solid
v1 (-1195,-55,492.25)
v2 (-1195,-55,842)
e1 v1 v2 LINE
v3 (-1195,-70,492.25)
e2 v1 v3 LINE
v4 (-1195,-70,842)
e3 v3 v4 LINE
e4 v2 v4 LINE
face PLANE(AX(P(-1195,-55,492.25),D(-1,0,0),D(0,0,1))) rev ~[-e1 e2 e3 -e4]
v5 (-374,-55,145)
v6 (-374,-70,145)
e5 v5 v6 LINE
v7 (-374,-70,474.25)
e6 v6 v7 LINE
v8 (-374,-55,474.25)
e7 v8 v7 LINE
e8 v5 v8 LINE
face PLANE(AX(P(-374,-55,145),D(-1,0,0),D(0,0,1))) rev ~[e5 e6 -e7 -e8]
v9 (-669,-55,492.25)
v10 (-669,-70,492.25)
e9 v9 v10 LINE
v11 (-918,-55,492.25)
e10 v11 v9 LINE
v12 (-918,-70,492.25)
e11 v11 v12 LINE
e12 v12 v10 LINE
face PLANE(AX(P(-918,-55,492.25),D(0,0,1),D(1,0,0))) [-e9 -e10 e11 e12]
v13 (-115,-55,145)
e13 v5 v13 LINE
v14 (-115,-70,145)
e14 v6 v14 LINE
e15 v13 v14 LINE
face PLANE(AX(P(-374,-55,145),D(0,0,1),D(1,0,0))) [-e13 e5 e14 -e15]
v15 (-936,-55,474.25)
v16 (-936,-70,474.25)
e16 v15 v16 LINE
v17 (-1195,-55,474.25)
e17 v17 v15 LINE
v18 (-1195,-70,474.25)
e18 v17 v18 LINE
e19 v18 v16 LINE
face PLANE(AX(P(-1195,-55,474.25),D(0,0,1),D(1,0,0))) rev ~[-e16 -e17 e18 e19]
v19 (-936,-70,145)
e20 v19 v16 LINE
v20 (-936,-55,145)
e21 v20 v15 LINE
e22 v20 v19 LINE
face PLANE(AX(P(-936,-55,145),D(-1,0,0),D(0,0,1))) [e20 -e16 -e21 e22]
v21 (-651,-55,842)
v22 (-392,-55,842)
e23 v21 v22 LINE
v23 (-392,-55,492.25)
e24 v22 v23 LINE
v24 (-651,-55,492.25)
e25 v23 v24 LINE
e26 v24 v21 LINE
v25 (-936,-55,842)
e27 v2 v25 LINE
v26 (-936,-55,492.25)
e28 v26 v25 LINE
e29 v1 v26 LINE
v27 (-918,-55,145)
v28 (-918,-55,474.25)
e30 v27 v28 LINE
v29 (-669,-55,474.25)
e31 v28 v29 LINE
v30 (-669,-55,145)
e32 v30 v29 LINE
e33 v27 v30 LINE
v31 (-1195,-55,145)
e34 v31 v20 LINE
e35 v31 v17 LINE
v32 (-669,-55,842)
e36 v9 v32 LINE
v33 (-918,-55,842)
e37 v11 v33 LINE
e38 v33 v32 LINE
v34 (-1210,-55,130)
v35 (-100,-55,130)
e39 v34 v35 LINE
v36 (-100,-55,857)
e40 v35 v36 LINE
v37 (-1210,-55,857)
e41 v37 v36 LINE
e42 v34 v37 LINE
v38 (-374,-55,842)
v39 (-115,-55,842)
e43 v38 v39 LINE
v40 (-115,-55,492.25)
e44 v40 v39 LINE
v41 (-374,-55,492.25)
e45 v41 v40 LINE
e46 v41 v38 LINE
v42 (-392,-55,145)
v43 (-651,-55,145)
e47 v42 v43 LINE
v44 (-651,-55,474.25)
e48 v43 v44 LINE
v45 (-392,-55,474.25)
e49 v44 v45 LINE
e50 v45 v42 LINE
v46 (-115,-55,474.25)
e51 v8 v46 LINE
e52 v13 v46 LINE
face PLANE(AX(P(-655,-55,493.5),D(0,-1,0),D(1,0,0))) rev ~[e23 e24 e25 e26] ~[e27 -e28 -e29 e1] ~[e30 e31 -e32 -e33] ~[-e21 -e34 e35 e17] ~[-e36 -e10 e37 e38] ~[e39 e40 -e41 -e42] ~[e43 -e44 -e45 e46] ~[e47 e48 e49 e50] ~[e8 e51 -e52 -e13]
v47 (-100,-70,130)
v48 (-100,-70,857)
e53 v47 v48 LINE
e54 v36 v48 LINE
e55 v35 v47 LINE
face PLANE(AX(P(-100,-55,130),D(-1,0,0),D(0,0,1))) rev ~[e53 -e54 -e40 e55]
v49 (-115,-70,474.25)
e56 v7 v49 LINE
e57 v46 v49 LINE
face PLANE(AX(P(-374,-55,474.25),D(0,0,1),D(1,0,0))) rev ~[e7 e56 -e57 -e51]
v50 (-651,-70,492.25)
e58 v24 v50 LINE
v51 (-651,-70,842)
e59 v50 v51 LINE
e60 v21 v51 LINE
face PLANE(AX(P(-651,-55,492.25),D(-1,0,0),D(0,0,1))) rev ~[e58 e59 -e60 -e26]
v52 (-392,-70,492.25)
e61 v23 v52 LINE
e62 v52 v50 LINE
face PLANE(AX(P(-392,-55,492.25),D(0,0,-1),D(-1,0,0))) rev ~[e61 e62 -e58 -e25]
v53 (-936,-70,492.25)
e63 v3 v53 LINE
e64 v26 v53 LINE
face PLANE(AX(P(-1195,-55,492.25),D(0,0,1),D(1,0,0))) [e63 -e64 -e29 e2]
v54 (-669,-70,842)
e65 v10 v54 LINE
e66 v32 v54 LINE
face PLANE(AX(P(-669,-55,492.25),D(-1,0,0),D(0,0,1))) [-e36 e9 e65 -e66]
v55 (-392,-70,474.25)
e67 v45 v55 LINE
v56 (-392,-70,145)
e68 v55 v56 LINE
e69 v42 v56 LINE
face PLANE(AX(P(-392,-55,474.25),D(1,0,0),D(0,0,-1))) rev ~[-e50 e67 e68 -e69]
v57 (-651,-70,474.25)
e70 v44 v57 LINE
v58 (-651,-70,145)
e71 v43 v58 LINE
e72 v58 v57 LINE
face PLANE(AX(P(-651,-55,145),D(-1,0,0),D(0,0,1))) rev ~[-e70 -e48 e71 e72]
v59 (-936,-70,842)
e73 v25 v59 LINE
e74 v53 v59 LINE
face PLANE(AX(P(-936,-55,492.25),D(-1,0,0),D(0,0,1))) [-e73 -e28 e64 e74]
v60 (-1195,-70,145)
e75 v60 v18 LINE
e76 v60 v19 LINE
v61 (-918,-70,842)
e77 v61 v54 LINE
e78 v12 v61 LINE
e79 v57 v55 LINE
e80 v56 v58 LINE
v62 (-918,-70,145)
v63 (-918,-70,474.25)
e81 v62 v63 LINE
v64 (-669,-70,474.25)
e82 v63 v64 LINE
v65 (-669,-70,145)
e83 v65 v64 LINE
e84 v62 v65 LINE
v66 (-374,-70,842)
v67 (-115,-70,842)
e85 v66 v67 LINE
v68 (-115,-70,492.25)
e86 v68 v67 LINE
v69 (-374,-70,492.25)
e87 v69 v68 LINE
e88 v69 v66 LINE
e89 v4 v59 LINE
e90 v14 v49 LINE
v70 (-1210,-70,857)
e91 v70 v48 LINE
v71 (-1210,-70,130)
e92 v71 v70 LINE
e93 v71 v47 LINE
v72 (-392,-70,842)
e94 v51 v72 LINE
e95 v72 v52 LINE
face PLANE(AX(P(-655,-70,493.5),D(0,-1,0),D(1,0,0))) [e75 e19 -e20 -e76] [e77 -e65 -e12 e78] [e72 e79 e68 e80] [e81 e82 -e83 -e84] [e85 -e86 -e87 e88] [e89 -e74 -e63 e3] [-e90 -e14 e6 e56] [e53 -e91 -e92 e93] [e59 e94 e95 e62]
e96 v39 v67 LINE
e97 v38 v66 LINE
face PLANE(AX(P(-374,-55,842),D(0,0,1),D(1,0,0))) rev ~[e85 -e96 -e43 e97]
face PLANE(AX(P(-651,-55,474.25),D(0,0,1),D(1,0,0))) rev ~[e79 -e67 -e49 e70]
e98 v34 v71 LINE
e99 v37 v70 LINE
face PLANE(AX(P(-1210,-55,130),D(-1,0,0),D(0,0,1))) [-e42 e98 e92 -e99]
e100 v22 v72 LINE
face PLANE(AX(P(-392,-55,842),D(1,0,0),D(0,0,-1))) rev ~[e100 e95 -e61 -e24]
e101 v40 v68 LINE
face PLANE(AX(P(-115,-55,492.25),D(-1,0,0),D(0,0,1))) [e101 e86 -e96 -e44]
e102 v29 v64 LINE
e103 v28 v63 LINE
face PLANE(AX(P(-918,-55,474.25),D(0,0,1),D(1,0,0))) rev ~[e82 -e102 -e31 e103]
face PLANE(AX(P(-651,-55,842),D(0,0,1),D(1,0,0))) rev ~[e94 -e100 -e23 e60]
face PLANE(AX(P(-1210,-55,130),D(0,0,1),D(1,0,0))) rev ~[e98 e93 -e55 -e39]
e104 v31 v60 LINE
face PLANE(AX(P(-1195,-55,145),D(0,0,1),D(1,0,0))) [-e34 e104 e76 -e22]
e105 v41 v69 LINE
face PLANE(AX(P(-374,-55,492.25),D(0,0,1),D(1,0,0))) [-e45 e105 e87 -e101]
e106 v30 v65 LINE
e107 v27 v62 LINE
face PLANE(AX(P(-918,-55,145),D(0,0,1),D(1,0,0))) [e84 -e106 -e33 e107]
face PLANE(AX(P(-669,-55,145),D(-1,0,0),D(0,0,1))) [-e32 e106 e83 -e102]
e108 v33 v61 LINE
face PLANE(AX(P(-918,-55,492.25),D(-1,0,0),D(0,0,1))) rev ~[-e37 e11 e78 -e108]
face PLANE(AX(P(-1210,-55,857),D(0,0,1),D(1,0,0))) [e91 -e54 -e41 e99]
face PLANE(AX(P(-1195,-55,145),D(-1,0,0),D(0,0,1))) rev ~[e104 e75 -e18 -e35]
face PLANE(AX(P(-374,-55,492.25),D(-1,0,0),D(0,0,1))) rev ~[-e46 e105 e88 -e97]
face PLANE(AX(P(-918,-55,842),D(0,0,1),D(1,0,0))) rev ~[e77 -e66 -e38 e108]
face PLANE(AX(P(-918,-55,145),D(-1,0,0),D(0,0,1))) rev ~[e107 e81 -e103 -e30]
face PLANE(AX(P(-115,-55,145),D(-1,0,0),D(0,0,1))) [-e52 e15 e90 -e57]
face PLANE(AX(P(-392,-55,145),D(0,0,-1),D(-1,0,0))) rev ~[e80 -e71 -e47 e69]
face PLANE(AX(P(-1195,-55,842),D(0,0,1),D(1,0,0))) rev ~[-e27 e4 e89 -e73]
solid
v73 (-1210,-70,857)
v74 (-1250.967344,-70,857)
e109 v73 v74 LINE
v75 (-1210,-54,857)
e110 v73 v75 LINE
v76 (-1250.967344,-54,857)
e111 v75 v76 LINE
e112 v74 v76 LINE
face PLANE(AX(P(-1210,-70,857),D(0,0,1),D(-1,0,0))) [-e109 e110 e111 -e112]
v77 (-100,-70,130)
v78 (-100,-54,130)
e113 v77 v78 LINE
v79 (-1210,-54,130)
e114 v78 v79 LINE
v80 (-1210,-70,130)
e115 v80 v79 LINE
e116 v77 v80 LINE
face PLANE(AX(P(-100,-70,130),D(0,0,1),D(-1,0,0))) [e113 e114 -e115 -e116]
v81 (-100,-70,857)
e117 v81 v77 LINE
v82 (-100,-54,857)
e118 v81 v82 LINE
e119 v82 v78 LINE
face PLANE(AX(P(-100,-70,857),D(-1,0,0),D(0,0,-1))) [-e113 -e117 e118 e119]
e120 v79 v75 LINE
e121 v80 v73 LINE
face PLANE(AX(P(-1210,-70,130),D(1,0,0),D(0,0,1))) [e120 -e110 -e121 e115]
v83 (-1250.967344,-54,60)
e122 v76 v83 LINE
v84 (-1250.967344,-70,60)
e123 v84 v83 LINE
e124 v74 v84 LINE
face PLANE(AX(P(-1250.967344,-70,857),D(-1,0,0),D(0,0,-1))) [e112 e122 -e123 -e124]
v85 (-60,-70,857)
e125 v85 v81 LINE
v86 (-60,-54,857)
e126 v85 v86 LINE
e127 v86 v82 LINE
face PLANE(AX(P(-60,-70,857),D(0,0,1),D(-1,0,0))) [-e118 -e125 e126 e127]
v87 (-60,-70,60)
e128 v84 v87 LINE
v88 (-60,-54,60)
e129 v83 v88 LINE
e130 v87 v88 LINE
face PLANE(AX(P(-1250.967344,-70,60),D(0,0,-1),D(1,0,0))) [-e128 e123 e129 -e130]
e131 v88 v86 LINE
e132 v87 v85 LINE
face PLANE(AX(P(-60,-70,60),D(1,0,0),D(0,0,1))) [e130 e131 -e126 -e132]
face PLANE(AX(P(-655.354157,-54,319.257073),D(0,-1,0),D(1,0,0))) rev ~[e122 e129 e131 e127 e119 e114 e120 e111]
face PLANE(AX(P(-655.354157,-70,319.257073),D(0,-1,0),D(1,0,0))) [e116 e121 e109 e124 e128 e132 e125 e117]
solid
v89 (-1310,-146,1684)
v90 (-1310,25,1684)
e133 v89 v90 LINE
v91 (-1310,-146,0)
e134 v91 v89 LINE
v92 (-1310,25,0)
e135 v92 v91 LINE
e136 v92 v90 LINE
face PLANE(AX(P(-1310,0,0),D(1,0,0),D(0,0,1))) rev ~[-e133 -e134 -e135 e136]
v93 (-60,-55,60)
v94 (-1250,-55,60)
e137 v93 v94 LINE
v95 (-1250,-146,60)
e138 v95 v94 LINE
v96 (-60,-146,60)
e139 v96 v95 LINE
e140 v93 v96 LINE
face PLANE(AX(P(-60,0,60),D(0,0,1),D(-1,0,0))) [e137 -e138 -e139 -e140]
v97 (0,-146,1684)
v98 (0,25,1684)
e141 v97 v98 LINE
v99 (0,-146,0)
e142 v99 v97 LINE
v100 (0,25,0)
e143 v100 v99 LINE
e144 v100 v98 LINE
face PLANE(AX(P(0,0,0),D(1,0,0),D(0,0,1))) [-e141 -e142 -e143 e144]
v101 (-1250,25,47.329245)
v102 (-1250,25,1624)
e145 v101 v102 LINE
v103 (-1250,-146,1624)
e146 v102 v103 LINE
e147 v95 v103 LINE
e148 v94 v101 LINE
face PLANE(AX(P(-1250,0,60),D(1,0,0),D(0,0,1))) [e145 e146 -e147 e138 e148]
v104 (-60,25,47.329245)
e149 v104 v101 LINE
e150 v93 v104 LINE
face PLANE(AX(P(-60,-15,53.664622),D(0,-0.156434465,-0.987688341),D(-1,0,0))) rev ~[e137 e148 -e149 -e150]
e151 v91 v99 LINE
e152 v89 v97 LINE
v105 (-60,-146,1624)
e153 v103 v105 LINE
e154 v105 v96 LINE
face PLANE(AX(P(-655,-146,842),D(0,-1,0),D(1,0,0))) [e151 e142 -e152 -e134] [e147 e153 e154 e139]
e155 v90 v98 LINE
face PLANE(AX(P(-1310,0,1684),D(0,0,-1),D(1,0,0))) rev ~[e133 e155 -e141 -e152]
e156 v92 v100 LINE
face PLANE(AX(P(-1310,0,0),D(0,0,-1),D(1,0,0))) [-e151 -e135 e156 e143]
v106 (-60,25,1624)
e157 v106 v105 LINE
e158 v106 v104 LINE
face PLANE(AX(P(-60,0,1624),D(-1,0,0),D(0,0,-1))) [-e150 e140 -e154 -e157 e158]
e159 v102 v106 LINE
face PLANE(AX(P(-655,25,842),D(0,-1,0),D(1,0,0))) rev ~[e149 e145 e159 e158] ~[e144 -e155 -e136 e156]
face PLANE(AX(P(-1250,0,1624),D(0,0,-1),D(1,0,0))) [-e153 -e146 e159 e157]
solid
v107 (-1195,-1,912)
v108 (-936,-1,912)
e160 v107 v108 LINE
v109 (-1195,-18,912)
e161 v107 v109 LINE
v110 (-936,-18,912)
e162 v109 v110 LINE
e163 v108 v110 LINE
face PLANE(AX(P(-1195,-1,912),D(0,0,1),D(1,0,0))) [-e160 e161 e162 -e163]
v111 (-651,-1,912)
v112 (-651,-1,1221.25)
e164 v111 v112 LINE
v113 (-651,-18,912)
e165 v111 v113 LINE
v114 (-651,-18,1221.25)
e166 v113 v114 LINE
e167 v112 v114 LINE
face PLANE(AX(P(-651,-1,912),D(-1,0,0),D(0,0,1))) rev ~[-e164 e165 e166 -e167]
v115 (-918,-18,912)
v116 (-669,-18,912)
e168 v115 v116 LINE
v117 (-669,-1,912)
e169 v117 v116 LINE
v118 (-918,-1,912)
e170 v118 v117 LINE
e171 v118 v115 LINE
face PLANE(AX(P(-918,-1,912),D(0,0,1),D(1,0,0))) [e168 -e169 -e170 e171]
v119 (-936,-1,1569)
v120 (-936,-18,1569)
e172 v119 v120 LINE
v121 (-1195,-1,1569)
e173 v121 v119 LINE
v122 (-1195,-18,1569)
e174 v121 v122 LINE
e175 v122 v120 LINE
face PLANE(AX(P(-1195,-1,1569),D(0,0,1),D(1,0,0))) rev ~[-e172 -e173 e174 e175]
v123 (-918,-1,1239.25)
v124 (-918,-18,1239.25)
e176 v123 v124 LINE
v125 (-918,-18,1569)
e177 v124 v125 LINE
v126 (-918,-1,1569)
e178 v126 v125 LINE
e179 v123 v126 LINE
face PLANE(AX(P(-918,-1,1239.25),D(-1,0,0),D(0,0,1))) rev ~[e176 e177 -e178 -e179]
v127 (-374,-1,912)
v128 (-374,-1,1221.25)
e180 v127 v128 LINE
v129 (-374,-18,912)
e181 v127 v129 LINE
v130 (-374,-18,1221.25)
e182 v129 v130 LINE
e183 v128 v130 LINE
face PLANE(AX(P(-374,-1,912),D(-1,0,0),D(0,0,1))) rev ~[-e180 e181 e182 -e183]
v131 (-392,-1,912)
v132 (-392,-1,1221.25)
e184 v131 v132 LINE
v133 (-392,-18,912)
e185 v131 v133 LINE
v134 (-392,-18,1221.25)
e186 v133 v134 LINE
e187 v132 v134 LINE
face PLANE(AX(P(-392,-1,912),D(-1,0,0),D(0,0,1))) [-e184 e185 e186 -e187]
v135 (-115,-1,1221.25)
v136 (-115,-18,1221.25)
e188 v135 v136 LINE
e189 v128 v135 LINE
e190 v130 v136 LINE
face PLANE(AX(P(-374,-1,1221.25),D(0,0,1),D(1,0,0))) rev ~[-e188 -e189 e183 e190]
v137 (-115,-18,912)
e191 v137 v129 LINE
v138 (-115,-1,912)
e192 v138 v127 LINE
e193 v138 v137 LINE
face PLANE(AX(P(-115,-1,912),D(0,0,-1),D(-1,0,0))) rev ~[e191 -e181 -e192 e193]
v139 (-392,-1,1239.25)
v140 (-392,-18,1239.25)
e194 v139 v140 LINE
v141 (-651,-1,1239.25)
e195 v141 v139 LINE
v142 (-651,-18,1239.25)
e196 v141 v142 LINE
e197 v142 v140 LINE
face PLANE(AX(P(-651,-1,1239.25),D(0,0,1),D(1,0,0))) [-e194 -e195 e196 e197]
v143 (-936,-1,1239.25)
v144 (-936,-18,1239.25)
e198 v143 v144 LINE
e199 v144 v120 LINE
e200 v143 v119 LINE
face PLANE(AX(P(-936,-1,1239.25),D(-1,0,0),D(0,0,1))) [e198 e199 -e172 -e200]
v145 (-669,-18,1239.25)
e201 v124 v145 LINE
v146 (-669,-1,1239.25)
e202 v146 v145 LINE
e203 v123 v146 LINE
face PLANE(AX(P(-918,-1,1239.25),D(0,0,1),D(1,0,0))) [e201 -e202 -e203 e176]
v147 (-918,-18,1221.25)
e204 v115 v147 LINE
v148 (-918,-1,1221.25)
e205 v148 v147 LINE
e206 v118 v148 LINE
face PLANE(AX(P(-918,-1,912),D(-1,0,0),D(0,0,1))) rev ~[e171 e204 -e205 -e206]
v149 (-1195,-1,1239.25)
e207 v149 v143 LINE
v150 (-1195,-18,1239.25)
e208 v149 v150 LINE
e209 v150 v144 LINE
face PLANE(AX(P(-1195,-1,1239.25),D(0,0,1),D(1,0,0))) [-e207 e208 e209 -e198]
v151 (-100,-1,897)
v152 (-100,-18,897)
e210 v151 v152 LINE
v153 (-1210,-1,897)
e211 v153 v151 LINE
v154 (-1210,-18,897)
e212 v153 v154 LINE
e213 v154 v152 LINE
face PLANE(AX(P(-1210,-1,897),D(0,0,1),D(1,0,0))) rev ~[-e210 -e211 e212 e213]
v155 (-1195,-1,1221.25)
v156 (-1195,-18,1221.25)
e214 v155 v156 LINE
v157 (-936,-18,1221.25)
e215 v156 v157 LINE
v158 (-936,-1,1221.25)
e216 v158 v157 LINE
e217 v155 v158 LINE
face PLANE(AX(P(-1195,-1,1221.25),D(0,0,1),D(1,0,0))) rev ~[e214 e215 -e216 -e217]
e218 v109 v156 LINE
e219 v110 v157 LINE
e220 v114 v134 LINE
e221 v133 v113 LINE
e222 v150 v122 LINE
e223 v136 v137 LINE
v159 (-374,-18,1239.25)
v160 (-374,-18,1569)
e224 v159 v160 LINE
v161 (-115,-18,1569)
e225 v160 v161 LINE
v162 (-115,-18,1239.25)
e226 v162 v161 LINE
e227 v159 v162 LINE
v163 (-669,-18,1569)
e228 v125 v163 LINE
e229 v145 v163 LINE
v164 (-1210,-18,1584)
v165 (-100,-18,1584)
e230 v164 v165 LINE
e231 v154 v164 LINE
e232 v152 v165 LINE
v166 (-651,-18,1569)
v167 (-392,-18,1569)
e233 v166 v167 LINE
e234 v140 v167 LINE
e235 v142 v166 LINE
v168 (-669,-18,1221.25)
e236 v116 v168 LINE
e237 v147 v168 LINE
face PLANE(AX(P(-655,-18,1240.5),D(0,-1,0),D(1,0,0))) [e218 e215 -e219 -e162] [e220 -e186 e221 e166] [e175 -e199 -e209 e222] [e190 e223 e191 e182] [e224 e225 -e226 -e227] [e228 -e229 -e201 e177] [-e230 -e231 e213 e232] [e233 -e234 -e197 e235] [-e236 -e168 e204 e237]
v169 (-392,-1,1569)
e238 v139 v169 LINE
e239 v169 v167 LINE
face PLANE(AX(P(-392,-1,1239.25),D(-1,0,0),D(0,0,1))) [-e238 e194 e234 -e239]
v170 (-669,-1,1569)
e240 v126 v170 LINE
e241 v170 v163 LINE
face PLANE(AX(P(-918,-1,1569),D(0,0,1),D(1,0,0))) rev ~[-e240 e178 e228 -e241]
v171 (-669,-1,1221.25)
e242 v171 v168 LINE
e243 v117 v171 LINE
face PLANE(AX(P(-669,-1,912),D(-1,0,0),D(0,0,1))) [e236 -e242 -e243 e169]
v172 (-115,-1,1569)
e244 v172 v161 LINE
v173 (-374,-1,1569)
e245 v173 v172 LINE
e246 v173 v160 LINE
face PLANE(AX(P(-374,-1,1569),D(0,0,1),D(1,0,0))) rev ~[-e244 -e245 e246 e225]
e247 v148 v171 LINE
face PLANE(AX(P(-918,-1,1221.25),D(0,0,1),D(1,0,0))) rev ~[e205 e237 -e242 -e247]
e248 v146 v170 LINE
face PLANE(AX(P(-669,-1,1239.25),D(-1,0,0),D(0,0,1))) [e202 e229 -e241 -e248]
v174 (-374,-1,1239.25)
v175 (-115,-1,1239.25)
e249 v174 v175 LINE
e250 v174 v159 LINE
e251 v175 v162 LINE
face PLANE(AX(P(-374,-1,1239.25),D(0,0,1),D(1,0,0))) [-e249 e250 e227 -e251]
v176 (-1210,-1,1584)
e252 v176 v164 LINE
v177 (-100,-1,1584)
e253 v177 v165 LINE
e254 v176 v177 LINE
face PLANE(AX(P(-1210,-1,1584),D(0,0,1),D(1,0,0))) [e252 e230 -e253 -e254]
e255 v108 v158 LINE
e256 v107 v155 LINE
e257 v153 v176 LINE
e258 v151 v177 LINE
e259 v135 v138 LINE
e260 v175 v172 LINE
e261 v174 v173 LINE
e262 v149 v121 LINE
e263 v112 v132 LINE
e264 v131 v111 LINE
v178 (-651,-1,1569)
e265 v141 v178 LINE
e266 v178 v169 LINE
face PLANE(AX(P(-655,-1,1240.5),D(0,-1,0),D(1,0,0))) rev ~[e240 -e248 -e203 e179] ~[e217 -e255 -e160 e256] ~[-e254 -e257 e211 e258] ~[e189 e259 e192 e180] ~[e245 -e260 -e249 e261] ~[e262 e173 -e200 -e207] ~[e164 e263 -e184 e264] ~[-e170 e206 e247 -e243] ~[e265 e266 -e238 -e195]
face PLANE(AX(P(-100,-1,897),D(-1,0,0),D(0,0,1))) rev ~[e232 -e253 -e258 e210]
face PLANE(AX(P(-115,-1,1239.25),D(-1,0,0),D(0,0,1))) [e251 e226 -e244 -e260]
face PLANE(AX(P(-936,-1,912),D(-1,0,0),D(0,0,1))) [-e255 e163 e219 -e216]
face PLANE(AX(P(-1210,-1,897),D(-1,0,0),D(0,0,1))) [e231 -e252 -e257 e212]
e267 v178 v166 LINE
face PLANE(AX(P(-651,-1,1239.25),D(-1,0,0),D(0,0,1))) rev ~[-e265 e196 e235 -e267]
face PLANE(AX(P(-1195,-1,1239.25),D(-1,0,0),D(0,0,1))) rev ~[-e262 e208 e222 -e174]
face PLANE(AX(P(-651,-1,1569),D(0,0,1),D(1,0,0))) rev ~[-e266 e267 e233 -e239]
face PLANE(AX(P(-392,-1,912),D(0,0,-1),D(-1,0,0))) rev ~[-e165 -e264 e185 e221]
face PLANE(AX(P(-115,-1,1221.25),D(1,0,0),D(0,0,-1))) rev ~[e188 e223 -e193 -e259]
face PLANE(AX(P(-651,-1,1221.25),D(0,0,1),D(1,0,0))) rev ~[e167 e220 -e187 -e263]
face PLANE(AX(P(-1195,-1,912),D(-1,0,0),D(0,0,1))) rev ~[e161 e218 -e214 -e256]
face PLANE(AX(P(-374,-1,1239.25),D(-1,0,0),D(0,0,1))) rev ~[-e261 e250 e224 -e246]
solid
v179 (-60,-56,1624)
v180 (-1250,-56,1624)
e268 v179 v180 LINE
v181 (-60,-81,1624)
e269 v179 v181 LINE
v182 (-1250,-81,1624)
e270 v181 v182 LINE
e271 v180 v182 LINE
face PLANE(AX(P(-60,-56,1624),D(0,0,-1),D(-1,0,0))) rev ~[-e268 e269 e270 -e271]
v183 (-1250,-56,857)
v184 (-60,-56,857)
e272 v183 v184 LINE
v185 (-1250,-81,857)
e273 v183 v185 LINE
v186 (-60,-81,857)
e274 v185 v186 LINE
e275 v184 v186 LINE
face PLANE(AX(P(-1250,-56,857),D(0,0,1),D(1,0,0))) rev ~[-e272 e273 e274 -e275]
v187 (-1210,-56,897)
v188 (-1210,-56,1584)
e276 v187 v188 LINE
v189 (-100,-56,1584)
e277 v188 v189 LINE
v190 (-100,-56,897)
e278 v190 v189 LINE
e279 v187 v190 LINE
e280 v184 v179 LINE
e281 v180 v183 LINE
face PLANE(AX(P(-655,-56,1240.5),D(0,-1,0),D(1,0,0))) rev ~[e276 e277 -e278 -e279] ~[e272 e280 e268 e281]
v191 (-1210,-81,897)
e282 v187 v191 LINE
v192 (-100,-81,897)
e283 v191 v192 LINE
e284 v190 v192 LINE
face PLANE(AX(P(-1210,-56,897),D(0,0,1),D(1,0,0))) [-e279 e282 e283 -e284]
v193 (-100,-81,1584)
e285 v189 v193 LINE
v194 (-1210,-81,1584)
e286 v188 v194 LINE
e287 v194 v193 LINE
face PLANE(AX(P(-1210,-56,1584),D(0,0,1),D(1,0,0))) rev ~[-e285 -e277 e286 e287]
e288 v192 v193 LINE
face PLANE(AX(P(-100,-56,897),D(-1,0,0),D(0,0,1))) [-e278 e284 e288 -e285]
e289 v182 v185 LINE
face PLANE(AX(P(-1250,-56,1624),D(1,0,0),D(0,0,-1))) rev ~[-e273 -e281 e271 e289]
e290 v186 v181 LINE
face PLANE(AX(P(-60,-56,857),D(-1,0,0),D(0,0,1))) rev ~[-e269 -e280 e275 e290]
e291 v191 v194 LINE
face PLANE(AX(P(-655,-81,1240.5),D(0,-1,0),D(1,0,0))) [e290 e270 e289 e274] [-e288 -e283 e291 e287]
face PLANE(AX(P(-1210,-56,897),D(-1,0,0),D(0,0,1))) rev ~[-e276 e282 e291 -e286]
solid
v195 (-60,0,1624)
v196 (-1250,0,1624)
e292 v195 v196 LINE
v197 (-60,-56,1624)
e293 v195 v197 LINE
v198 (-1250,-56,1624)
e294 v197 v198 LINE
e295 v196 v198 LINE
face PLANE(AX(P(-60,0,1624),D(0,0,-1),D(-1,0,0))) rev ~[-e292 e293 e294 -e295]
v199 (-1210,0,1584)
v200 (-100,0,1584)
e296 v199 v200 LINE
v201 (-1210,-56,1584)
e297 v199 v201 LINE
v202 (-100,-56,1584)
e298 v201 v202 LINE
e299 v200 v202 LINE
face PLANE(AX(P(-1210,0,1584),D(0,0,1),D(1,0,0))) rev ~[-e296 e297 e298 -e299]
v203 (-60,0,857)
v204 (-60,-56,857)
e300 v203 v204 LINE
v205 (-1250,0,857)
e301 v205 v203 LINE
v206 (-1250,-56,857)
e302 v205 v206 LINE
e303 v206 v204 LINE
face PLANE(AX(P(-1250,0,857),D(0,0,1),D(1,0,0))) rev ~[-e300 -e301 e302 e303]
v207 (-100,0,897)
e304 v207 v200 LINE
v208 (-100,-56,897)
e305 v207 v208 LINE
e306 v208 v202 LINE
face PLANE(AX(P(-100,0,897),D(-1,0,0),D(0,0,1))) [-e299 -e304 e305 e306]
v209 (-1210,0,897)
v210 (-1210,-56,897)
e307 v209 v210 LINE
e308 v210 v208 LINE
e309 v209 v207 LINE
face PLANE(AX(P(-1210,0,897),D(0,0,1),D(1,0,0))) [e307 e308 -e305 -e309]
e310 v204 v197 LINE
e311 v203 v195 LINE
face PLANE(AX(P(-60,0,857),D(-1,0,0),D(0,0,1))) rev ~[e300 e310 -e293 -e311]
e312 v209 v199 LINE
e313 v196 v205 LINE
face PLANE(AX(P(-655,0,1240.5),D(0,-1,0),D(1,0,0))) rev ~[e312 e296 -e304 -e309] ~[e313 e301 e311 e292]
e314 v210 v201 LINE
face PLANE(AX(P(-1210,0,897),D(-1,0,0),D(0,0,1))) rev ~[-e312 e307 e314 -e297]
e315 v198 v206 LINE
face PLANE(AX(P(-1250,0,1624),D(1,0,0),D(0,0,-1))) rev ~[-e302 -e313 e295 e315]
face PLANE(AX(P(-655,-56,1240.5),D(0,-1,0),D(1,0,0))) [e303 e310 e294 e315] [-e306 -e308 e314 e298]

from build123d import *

# Parameters (mm, degrees)
F0_W          = 1310
F0_H          = 1684
F1_DEPTH      = 146
F1_DEPTH_BACK = 25
F0_W_2        = 1110
F0_H_2        = 687
F2_DEPTH      = 56
F3_START      = 1
F0_W_3        = 259
F0_H_3        = 309.25
F0_W_4        = 249
F0_H_4        = 329.75
F0_W_5        = 18
F3_DEPTH      = 17
F4_START      = 55
F0_H_5        = 727
F0_H_6        = 329.25
F0_H_7        = 349.75
F4_DEPTH      = 15
F5_SIZE2      = 12.670755226
F5_SIZE       = 80
F6_DEPTH      = 25
F8_DEPTH      = 16


# Not quite as in the source:
# - a feature names something its author has since deleted; it is built from what else it names


with BuildPart() as f1:
    # F0 (on Front) → F1 (new body, two sides)
    with BuildSketch(Plane.XZ) as f1_sk:
        with Locations((-655, 842)):
            Rectangle(F0_W, F0_H)
        Polygon((-1250, 1624), (-60, 1624), (-60, 857), (-60, 60), (-1250, 60), (-1250, 857), align=None, mode=Mode.SUBTRACT)
    extrude(amount=F1_DEPTH)
    extrude(f1_sk.sketch, amount=-F1_DEPTH_BACK)

    # F5
    f5_edges = [f1.edges().sort_by_distance(p)[0] for p in [
        (-655, 25, 60),
    ]]
    f5_side = f1.faces().sort_by_distance((-655, -60.5, 60))[0]
    chamfer(f5_edges, length=F5_SIZE, length2=F5_SIZE2, reference=f5_side)


with BuildPart() as f2:
    # F0 (on Front) → F2 (new body)
    with BuildSketch(Plane.XZ):
        Polygon((-60, 857), (-60, 1624), (-1250, 1624), (-1250, 857), (-1210, 857), (-100, 857), align=None)
        with Locations((-655, 1240.5)):
            Rectangle(F0_W_2, F0_H_2, mode=Mode.SUBTRACT)
    extrude(amount=F2_DEPTH)


with BuildPart() as f3:
    # F0 (on Front) → F3 (new body)
    with BuildSketch(Plane.XZ.offset(F3_START)):
        with Locations((-655, 1240.5)):
            Rectangle(F0_W_2, F0_H_2)
        with Locations((-1065.5, 1066.625)):
            Rectangle(F0_W_3, F0_H_3, mode=Mode.SUBTRACT)
        with Locations((-793.5, 1066.625)):
            Rectangle(F0_W_4, F0_H_3, mode=Mode.SUBTRACT)
        with Locations((-1065.5, 1404.125)):
            Rectangle(F0_W_3, F0_H_4, mode=Mode.SUBTRACT)
        with Locations((-793.5, 1404.125)):
            Rectangle(F0_W_4, F0_H_4, mode=Mode.SUBTRACT)
        Polygon((-374, 1221.25), (-115, 1221.25), (-115, 912), (-374, 912), (-392, 912), (-651, 912), (-651, 1221.25), (-392, 1221.25), align=None, mode=Mode.SUBTRACT)
        with Locations((-521.5, 1404.125)):
            Rectangle(F0_W_3, F0_H_4, mode=Mode.SUBTRACT)
        with Locations((-244.5, 1404.125)):
            Rectangle(F0_W_3, F0_H_4, mode=Mode.SUBTRACT)
        with Locations((-383, 1066.625)):
            Rectangle(F0_W_5, F0_H_3)
    extrude(amount=F3_DEPTH)


with BuildPart() as f4:
    # F0 (on Front) → F4 (new body)
    with BuildSketch(Plane.XZ.offset(F4_START)):
        with Locations((-655, 493.5)):
            Rectangle(F0_W_2, F0_H_5)
        with Locations((-1065.5, 309.625)):
            Rectangle(F0_W_3, F0_H_6, mode=Mode.SUBTRACT)
        with Locations((-793.5, 309.625)):
            Rectangle(F0_W_4, F0_H_6, mode=Mode.SUBTRACT)
        with Locations((-1065.5, 667.125)):
            Rectangle(F0_W_3, F0_H_7, mode=Mode.SUBTRACT)
        with Locations((-793.5, 667.125)):
            Rectangle(F0_W_4, F0_H_7, mode=Mode.SUBTRACT)
        Polygon((-651, 474.25), (-467.1856169297, 474.25), (-392, 474.25), (-392, 145), (-534.5, 145), (-651, 145), align=None, mode=Mode.SUBTRACT)
        with Locations((-244.5, 309.625)):
            Rectangle(F0_W_3, F0_H_6, mode=Mode.SUBTRACT)
        Polygon((-651, 842), (-392, 842), (-392, 492.25), (-463.5055595409, 492.25), (-651, 492.25), align=None, mode=Mode.SUBTRACT)
        with Locations((-244.5, 667.125)):
            Rectangle(F0_W_3, F0_H_7, mode=Mode.SUBTRACT)
    extrude(amount=F4_DEPTH)


with BuildPart() as f6:
    # F6 (new): a face of the model
    f6_faces = [f2.part.faces().sort_by_distance(p)[0] for p in [
        (-74.1576445781, -56, 1240.5),
    ]]
    extrude(f6_faces, amount=F6_DEPTH)


with BuildPart() as f8:
    # F7 (on face) → F8 (new body)
    with BuildSketch(Plane.XZ.offset(70)):
        Polygon((-1210, 857), (-1250.9673437476, 857), (-1250.9673437476, 60), (-60, 60), (-60, 857), (-100, 857), (-100, 130), (-1210, 130), align=None)
    extrude(amount=-F8_DEPTH)


solid = Compound([f1.part, f2.part, f3.part, f4.part, f6.part, f8.part])
